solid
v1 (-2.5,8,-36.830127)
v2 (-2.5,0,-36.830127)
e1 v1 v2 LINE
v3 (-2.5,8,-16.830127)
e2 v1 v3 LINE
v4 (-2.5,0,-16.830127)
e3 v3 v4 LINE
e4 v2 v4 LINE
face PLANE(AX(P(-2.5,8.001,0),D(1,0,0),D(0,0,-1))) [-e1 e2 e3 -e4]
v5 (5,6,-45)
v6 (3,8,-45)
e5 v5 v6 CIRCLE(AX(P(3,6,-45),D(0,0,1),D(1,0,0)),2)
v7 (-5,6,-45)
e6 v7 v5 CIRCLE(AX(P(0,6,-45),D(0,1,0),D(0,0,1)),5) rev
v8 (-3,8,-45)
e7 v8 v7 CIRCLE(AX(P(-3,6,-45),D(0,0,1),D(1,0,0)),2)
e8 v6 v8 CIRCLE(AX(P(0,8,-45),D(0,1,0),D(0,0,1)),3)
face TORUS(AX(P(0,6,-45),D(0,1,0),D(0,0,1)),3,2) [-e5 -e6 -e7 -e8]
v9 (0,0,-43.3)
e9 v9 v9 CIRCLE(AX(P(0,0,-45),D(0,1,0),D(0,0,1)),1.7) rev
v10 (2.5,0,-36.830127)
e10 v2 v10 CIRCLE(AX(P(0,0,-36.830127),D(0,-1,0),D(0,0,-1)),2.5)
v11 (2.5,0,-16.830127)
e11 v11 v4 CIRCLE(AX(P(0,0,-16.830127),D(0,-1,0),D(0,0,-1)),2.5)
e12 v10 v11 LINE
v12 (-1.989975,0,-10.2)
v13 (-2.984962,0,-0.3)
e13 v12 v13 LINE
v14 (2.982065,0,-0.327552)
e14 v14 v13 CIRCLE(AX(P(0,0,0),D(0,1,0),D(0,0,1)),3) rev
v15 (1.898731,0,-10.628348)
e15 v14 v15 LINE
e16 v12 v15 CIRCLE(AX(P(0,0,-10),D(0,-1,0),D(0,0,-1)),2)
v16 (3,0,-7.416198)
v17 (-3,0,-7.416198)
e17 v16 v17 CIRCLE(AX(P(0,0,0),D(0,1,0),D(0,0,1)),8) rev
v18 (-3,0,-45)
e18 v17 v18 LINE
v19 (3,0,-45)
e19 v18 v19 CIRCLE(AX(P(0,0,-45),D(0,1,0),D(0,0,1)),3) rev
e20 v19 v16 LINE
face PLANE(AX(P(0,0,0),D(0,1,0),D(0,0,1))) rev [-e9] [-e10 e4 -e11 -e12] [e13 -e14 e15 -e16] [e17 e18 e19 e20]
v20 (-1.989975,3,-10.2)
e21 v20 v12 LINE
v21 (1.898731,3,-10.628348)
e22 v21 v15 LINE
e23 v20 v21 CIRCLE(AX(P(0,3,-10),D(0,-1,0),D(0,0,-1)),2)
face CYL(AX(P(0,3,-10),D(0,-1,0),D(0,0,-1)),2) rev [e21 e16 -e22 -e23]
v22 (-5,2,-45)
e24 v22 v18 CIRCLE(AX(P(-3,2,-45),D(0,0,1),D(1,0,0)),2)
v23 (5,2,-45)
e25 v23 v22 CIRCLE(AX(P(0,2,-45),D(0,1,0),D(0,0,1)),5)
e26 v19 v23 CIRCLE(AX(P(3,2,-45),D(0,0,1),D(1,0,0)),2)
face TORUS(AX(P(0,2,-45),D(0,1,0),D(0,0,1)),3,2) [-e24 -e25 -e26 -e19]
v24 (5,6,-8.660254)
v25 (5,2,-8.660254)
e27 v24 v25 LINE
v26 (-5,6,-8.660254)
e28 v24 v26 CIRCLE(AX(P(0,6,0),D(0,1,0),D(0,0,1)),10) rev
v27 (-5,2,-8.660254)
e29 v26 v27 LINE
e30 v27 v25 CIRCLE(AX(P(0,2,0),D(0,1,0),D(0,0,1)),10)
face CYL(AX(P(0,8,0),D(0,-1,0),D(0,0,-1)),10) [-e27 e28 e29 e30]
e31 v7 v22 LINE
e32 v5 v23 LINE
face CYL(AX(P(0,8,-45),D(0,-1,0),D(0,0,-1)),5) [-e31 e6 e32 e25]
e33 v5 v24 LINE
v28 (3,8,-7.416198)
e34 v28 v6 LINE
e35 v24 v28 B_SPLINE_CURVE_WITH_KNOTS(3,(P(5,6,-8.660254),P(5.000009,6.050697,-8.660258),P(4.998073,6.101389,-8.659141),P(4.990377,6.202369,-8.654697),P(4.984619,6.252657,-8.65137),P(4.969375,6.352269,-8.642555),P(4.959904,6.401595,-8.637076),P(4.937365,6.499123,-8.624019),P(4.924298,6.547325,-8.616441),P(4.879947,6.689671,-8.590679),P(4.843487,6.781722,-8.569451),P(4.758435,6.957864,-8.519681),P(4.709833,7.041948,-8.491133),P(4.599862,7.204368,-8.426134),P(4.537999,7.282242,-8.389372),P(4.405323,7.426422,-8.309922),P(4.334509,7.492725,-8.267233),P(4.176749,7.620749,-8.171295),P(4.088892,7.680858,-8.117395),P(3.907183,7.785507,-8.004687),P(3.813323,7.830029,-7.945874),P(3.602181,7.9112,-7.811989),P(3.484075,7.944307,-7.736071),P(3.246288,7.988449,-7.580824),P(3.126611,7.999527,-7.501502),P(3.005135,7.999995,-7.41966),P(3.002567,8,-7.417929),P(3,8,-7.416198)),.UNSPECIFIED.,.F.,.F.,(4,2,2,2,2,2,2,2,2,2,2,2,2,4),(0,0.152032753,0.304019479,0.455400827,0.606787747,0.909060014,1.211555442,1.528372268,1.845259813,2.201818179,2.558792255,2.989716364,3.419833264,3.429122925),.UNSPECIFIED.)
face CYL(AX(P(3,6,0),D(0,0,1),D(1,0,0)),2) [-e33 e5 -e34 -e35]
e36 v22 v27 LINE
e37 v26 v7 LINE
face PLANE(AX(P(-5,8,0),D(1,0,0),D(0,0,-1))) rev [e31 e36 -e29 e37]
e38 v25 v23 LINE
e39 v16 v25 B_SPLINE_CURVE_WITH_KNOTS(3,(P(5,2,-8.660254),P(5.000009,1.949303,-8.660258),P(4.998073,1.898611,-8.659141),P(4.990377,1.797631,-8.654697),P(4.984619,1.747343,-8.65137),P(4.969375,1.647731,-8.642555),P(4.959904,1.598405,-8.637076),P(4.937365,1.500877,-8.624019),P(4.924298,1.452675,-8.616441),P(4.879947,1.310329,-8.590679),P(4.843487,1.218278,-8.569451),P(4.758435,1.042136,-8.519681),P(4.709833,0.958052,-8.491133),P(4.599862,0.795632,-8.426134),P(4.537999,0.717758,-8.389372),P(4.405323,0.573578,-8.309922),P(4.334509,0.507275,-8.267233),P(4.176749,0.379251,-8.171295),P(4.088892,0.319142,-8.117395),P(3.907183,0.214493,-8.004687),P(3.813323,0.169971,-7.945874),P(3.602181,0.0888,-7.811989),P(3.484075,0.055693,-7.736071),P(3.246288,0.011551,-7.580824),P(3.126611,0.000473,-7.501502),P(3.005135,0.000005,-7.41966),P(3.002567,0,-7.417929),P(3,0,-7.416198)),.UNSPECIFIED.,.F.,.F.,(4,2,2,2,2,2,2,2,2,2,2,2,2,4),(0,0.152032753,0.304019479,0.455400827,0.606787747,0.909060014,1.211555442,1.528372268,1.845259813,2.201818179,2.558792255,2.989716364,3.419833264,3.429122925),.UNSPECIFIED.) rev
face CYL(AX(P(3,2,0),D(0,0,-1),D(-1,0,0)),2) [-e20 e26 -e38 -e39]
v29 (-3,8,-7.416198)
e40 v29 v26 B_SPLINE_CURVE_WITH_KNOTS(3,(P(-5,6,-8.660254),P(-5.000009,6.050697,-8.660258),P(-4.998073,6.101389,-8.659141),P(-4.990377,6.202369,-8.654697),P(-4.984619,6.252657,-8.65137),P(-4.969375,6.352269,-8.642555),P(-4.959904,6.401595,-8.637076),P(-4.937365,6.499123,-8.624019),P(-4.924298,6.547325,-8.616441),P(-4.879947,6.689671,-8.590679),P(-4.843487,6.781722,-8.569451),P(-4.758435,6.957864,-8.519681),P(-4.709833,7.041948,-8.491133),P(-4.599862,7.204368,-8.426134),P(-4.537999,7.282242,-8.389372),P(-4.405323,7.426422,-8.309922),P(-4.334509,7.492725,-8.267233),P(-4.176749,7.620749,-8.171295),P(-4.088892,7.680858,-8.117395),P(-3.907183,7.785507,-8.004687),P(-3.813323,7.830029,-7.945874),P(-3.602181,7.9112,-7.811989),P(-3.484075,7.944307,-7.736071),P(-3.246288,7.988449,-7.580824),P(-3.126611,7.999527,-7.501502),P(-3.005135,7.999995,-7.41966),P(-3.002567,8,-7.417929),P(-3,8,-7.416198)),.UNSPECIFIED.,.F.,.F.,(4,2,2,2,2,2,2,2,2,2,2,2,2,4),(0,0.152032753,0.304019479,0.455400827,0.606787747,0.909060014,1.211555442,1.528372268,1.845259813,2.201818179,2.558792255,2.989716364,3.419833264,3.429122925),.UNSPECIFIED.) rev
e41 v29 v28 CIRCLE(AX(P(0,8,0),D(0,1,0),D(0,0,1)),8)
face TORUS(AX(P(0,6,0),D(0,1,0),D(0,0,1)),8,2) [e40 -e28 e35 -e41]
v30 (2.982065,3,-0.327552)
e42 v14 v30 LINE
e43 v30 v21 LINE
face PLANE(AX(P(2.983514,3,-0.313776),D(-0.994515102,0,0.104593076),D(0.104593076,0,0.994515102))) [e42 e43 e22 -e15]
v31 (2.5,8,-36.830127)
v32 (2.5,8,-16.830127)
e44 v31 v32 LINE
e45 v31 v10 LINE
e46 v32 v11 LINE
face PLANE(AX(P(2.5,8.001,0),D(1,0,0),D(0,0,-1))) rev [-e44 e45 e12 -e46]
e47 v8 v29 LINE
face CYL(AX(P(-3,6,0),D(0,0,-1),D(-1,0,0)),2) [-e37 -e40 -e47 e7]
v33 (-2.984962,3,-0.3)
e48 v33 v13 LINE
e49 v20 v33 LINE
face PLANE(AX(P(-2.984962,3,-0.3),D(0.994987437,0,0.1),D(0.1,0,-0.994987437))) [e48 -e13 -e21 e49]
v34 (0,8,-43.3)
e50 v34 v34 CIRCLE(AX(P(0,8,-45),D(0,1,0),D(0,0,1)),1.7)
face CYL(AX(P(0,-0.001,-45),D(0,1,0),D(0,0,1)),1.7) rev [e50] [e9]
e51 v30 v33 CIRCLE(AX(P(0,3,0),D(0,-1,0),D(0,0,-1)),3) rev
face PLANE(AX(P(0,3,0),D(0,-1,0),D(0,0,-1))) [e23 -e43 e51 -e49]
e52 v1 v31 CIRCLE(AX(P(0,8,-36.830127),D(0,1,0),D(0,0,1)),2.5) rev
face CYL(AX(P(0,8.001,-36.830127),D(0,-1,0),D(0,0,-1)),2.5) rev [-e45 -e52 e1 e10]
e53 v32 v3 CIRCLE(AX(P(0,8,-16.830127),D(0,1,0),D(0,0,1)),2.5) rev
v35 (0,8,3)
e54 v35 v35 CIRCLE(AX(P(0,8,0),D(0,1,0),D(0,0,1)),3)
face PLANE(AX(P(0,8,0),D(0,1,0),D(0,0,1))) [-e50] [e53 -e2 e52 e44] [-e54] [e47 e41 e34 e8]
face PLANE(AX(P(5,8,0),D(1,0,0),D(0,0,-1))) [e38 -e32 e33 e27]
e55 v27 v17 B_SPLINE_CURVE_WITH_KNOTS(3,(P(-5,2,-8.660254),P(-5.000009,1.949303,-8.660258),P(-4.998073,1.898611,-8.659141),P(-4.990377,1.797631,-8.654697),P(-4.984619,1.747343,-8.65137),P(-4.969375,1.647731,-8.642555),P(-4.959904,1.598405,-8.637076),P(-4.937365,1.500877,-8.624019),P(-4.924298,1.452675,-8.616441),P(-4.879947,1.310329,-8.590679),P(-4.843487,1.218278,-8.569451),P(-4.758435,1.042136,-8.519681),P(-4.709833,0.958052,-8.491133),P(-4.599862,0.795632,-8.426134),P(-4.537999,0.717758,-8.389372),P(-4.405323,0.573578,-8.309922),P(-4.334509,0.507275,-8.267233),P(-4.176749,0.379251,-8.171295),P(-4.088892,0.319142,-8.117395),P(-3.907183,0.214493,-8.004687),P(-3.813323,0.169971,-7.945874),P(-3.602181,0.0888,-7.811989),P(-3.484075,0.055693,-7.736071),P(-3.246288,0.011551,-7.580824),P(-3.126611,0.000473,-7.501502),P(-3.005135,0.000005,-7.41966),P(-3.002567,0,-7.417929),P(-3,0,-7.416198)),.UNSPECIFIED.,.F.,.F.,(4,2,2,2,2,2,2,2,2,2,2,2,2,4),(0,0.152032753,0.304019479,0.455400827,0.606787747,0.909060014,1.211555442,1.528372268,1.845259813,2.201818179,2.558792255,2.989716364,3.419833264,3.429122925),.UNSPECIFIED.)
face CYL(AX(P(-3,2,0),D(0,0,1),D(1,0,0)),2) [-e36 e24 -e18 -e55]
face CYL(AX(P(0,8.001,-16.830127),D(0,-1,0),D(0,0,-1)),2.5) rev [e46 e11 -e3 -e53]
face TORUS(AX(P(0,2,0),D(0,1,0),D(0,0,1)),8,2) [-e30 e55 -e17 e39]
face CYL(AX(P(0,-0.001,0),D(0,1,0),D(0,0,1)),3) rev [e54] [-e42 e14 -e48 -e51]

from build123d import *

# Parameters (mm, degrees)
EXTRUDE_1_DEPTH     = 8
CUT_EXTRUDE_1_REACH = 53.614
CUT_EXTRUDE_START   = -3
CUT_EXTRUDE_2_DEPTH = 3
CUT_EXTRUDE_3_REACH = 53.614
CUT_EXTRUDE_4_REACH = 53.614
FILLET_2_R          = 2


with BuildPart() as part:
    # 草图1 → 凸台-拉伸1 (new body)
    with BuildSketch(Plane(origin=(0, 0, 0), x_dir=(1, 0, 0), z_dir=(0, 1, 0))):
        with BuildLine():
            Line((-5, 45), (-5, 8.660254038))
            ThreePointArc((-5, 8.660254038), (0, -10), (5, 8.660254038))
            Line((5, 8.660254038), (5, 45))
            ThreePointArc((5, 45), (0, 50), (-5, 45))
        make_face()
    extrude(amount=EXTRUDE_1_DEPTH)

    # 草图2 → 切除-拉伸1 (cut, up to next)
    with BuildSketch(Plane(origin=(0, 8, 0), x_dir=(1, 0, 0), z_dir=(0, 1, 0)), mode=Mode.PRIVATE) as cut_extrude_1_sk1:
        with BuildLine():
            ThreePointArc((3, 0), (2.121320344, 2.121320344), (0, 3))
            ThreePointArc((0, 3), (-2.121320344, -2.121320344), (3, 0))
        make_face()
    cut_extrude_1_tool1 = extrude(cut_extrude_1_sk1.sketch, amount=-CUT_EXTRUDE_1_REACH, mode=Mode.PRIVATE) & part.part
    add(cut_extrude_1_tool1.solids().sort_by_distance((0, 8, 0))[0], mode=Mode.SUBTRACT)

    # 草图3 → 切除-拉伸2 (cut)
    with BuildSketch(Plane.XZ.offset(CUT_EXTRUDE_START)):
        with BuildLine():
            Line((-2.984962311, -0.3), (-1.989974874, -10.2))
            ThreePointArc((-1.989974874, -10.2), (-0.218979353, -11.987975866), (1.898730713, -10.628348376))
            Line((1.898730713, -10.628348376), (2.984962311, -0.3))
            ThreePointArc((2.984962311, -0.3), (0, 3), (-2.984962311, -0.3))
        make_face()
    extrude(amount=CUT_EXTRUDE_2_DEPTH, mode=Mode.SUBTRACT)

    # 草图4 → 切除-拉伸3 (cut, up to next)
    with BuildSketch(Plane(origin=(0, 8, 0), x_dir=(1, 0, 0), z_dir=(0, 1, 0)), mode=Mode.PRIVATE) as cut_extrude_3_sk1:
        with BuildLine():
            ThreePointArc((1.7, 45), (-1.202081528, 46.202081528), (0, 43.3))
            ThreePointArc((0, 43.3), (1.202081528, 43.797918472), (1.7, 45))
        make_face()
    cut_extrude_3_tool1 = extrude(cut_extrude_3_sk1.sketch, amount=-CUT_EXTRUDE_3_REACH, mode=Mode.PRIVATE) & part.part
    add(cut_extrude_3_tool1.solids().sort_by_distance((0, 8, -45))[0], mode=Mode.SUBTRACT)

    # 草图5 → 切除-拉伸4 (cut, up to next)
    with BuildSketch(Plane.XZ, mode=Mode.PRIVATE) as cut_extrude_4_sk1:
        with BuildLine():
            Line((-2.5, -16.830127019), (-2.5, -26.830127019))
            Line((-2.5, -26.830127019), (-2.5, -36.830127019))
            ThreePointArc((-2.5, -36.830127019), (0, -39.330127019), (2.5, -36.830127019))
            Line((2.5, -36.830127019), (2.5, -16.830127019))
            ThreePointArc((2.5, -16.830127019), (0, -14.330127019), (-2.5, -16.830127019))
        make_face()
    cut_extrude_4_tool1 = extrude(cut_extrude_4_sk1.sketch, amount=-CUT_EXTRUDE_4_REACH, mode=Mode.PRIVATE) & part.part
    add(cut_extrude_4_tool1.solids().sort_by_distance((0, 0, -26.830127))[0], mode=Mode.SUBTRACT)

    # 圆角2
    fillet_2_edges = [part.edges().sort_by_distance(p)[0] for p in [
        (0, 0, 10),
        (-5, 0, -26.830127019),
        (0, 0, -50),
        (5, 0, -26.830127019),
        (0, 8, 10),
        (5, 8, -26.830127019),
        (0, 8, -50),
        (-5, 8, -26.830127019),
    ]]
    fillet(fillet_2_edges, radius=FILLET_2_R)


solid = part.part
